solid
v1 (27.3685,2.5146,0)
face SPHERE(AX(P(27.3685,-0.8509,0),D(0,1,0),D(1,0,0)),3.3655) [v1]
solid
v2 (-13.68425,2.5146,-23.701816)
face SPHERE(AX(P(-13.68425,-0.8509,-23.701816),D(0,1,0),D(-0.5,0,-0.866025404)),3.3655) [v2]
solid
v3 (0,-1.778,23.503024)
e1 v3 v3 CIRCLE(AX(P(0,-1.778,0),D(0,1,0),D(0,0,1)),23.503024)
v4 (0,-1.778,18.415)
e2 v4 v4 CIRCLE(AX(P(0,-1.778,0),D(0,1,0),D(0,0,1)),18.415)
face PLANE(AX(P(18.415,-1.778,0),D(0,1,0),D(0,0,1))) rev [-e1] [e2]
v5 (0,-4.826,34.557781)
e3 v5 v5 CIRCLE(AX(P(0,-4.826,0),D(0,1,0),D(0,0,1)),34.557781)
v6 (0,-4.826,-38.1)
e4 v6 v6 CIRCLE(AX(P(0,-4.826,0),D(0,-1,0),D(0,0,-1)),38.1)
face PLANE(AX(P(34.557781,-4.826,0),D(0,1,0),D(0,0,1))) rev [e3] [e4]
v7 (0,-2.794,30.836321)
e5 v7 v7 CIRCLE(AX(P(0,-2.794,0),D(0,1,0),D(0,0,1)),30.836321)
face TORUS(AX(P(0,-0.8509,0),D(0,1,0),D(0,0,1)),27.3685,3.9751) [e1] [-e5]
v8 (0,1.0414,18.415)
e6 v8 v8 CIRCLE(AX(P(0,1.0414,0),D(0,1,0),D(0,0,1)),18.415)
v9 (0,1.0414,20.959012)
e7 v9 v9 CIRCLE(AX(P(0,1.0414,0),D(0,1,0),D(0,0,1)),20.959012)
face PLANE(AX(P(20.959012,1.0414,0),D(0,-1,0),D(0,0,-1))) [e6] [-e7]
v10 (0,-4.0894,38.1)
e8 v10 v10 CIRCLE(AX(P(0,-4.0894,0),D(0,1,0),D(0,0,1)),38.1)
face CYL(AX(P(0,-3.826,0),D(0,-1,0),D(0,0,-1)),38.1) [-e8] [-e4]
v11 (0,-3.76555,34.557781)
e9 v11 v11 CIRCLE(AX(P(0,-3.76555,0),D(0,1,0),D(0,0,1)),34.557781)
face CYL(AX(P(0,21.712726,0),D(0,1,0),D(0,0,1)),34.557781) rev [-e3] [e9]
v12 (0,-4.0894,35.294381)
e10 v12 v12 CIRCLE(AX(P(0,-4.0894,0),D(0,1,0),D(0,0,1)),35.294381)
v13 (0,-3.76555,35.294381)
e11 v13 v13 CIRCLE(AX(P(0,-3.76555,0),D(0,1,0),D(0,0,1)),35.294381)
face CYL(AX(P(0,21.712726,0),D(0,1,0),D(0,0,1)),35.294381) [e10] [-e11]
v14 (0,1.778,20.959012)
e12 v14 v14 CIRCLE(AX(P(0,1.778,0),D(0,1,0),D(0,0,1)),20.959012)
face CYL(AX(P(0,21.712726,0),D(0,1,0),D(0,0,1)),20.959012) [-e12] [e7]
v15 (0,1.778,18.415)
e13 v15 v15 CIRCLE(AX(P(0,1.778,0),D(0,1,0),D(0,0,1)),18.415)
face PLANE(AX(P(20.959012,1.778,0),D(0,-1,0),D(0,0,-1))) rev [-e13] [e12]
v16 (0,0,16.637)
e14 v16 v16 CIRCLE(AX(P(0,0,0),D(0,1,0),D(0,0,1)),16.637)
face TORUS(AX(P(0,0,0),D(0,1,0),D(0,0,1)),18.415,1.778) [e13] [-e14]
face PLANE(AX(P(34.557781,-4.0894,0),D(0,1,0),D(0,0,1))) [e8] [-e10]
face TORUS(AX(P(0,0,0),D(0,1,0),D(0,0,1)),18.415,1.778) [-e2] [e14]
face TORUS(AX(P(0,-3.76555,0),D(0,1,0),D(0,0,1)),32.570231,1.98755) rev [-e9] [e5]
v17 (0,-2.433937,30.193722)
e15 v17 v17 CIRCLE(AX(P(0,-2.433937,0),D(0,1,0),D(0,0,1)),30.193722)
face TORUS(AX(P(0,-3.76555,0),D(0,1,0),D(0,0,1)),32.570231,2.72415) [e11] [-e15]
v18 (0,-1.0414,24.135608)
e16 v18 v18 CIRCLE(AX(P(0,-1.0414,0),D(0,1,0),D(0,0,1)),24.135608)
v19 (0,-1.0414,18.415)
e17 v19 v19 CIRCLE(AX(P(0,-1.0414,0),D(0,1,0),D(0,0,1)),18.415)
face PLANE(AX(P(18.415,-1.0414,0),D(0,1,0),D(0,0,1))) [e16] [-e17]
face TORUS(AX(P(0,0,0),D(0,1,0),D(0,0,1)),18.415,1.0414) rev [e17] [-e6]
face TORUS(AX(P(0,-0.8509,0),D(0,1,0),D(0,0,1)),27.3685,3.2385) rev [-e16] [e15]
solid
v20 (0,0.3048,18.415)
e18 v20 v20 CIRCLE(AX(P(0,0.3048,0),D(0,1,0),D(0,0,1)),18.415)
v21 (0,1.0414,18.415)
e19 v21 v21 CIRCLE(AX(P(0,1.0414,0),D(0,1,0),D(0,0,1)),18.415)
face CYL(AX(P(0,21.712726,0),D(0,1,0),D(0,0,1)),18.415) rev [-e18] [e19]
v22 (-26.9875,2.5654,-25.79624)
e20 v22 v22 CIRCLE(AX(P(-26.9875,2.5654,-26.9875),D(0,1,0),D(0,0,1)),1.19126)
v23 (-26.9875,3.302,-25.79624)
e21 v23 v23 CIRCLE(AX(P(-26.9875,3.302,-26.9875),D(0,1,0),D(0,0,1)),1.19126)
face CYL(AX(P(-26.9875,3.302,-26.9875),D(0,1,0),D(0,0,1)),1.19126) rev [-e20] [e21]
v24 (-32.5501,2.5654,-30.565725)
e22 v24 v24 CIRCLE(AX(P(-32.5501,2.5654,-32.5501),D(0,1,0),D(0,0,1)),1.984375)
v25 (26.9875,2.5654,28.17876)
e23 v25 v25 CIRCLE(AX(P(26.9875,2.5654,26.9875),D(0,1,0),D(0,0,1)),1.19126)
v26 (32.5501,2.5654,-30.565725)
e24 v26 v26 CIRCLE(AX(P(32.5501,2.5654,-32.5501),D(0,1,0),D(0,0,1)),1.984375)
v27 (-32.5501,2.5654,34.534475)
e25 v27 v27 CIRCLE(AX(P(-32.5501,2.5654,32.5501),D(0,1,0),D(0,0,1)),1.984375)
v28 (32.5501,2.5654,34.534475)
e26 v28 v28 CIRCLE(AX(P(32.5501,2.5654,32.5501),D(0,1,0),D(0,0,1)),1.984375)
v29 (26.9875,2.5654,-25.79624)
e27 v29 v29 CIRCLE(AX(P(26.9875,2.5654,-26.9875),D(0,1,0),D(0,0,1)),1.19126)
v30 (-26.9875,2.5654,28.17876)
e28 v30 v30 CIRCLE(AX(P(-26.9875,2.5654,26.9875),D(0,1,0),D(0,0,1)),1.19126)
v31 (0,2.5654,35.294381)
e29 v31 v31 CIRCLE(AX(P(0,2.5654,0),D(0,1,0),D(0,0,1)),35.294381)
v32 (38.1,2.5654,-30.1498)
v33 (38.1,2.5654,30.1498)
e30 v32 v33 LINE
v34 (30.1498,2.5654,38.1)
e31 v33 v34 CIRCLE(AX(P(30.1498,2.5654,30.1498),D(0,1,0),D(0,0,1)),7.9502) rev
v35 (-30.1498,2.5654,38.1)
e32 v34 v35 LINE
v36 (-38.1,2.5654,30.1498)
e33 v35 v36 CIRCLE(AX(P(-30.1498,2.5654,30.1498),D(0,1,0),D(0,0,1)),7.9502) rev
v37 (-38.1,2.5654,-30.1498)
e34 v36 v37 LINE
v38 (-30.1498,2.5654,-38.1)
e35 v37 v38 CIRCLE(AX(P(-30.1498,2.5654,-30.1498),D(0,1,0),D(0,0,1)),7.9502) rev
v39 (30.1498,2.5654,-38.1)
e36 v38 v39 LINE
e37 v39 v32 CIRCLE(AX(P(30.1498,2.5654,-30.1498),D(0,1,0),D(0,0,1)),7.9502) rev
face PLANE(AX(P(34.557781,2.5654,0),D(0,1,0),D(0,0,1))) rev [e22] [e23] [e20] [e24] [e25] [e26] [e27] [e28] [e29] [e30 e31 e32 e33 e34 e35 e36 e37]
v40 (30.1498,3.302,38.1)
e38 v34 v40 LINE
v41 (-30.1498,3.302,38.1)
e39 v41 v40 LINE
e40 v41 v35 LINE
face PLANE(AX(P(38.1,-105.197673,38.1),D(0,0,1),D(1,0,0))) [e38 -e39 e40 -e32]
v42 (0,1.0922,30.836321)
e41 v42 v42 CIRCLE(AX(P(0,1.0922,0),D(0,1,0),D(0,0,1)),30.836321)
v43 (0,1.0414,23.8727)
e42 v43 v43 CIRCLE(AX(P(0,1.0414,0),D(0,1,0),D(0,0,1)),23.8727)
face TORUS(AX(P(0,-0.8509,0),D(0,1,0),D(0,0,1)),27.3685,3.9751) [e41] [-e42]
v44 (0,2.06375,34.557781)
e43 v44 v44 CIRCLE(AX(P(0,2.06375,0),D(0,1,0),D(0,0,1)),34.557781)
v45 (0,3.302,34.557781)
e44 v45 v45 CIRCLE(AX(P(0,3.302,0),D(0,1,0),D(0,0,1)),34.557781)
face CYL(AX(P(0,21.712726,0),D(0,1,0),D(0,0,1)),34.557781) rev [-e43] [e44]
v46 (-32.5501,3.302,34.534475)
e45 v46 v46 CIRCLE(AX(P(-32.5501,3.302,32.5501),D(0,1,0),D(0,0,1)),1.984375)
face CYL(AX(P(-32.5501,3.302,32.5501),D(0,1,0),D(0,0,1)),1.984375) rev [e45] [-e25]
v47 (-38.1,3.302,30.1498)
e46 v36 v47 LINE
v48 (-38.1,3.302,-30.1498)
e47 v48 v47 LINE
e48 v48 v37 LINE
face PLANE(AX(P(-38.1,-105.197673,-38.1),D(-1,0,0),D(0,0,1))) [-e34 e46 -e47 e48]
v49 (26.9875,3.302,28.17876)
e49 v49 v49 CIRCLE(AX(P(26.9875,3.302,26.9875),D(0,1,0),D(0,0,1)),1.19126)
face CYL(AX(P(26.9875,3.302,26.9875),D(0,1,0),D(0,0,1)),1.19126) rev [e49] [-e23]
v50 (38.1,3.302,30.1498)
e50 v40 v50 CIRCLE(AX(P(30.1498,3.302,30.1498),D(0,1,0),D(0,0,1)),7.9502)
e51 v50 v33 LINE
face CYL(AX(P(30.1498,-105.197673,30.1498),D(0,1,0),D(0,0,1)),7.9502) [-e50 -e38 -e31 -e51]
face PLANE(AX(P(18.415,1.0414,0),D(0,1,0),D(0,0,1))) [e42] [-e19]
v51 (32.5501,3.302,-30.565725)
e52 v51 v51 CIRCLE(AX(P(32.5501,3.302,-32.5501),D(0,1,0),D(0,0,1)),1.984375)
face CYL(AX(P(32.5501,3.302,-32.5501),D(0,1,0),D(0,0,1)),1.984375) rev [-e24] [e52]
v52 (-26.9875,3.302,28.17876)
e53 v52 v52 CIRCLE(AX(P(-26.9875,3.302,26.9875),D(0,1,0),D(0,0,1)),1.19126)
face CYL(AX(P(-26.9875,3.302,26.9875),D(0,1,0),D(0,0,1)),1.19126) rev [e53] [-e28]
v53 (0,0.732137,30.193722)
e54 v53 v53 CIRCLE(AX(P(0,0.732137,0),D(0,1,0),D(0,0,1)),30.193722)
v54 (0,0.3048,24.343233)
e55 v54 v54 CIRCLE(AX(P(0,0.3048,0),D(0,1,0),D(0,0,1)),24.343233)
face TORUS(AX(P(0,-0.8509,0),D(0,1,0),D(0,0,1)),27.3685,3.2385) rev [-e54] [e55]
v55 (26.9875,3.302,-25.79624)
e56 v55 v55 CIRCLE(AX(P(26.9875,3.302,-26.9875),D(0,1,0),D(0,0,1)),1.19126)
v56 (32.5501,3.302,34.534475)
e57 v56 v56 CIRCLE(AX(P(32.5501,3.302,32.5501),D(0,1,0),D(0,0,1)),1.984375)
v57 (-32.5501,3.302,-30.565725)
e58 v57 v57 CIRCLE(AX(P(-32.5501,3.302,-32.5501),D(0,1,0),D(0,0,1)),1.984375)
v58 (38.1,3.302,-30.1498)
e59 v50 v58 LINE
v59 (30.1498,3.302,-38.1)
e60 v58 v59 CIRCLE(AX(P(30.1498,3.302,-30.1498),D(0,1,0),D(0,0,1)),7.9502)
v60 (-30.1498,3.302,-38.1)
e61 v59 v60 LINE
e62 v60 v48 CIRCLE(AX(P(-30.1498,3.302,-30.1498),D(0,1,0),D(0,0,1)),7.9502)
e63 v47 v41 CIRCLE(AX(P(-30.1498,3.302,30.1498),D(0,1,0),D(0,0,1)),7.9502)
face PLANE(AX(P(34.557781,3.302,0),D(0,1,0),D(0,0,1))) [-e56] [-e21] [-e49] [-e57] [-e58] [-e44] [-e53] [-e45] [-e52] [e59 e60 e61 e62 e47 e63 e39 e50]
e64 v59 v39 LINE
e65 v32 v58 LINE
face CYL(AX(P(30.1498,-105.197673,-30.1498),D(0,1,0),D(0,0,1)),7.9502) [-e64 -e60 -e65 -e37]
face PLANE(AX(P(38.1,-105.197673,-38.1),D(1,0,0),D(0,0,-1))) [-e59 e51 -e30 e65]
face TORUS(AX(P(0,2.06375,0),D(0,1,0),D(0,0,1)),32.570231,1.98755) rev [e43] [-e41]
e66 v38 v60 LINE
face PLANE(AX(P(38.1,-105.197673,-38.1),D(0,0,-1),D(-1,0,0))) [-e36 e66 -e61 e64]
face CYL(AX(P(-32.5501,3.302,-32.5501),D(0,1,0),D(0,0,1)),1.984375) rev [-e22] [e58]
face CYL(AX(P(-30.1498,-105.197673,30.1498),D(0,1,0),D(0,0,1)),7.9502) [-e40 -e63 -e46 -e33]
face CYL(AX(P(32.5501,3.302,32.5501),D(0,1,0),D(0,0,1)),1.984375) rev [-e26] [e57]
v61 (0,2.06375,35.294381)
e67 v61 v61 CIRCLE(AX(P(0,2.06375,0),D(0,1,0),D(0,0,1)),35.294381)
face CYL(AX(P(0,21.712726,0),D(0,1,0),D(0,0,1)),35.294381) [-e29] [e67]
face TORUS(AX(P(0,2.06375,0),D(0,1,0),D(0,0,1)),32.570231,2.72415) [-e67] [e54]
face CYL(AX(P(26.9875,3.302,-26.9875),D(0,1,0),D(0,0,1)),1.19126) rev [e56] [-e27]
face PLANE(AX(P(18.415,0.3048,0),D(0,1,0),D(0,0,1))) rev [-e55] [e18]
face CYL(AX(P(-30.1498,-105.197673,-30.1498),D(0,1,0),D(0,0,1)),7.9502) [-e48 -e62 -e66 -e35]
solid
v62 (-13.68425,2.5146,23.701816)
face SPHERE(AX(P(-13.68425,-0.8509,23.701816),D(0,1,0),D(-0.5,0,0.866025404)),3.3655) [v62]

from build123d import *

# Parameters (mm, degrees)
SKETCH2_R                                 = 34.557781481
EXTRUDE1_DEPTH                            = 0.7366
EXTRUDE2_START                            = -0.7366
SKETCH3_W                                 = 76.2
SKETCH3_H                                 = 76.2
SKETCH3_R                                 = 34.557781481
EXTRUDE2_DEPTH                            = 0.7366
CIRPATTERN1_COUNT                         = 3
FILLET1_R                                 = 7.9502
FILLET2_R                                 = 7.9502
SKETCH5_W                                 = 1.984375
SKETCH5_H                                 = 0.7366
F_5_32_0_156250_DIAMETER_HOLE1_AT_2_COUNT = 2
F_5_32_0_156250_DIAMETER_HOLE1_AT_2_PITCH = 65.1002
F_5_32_0_156250_DIAMETER_HOLE1_AT_3_COUNT = 2
F_5_32_0_156250_DIAMETER_HOLE1_AT_3_PITCH = 65.1002
F_5_32_0_156250_DIAMETER_HOLE1_AT_4_COUNT = 2
F_5_32_0_156250_DIAMETER_HOLE1_AT_4_PITCH = 92.065585753
SKETCH7_W                                 = 1.984375
SKETCH7_H                                 = 8.128
F_5_32_0_156250_DIAMETER_HOLE2_AT_2_COUNT = 2
F_5_32_0_156250_DIAMETER_HOLE2_AT_2_PITCH = 65.1002
F_5_32_0_156250_DIAMETER_HOLE2_AT_3_COUNT = 2
F_5_32_0_156250_DIAMETER_HOLE2_AT_3_PITCH = 92.065585753
F_5_32_0_156250_DIAMETER_HOLE2_AT_4_COUNT = 2
F_5_32_0_156250_DIAMETER_HOLE2_AT_4_PITCH = 65.1002
F_3_32_0_09375_DIAMETER_HOLE1_AT_2_COUNT  = 2
F_3_32_0_09375_DIAMETER_HOLE1_AT_2_PITCH  = 53.975
F_3_32_0_09375_DIAMETER_HOLE1_AT_3_COUNT  = 2
F_3_32_0_09375_DIAMETER_HOLE1_AT_3_PITCH  = 76.332177029
F_3_32_0_09375_DIAMETER_HOLE1_AT_4_COUNT  = 2
F_3_32_0_09375_DIAMETER_HOLE1_AT_4_PITCH  = 53.975
SKETCH11_R                                = 51.664614741
SKETCH11_R_2                              = 38.1
CUT_EXTRUDE1_DEPTH                        = 1


# Read off the part's stored shape, not the designer's step: Revolve-Thin5
with BuildPart() as part:
    # Sketch1 → Revolve-Thin4 (revolve)
    with BuildSketch(Plane.XY, mode=Mode.PRIVATE) as revolve_thin4_sk:
        with BuildLine():
            Line((20.959011942, 1.778), (18.415, 1.778))
            ThreePointArc((18.415, 1.778), (16.637, 0), (18.415, -1.778))
            Line((18.415, -1.778), (23.503023884, -1.778))
            ThreePointArc((23.503023884, -1.778), (26.822976031, -4.788389506), (30.836320987, -2.794))
            ThreePointArc((30.836320987, -2.794), (33.072287853, -1.842454994), (34.557781481, -3.76555))
            Line((34.557781481, -3.76555), (34.557781481, -4.826))
            Line((34.557781481, -4.826), (38.1, -4.826))
            Line((38.1, -4.826), (38.1, -4.0894))
            Line((38.1, -4.0894), (35.294381481, -4.0894))
            Line((35.294381481, -4.0894), (35.294381481, -3.76555))
            ThreePointArc((35.294381481, -3.76555), (33.258353473, -1.129742468), (30.193721571, -2.433936741))
            ThreePointArc((30.193721571, -2.433936741), (26.643008112, -4.007091339), (24.135607796, -1.0414))
            Line((24.135607796, -1.0414), (18.415, -1.0414))
            ThreePointArc((18.415, -1.0414), (17.3736, 0), (18.415, 1.0414))
            Line((18.415, 1.0414), (20.959011942, 1.0414))
            Line((20.959011942, 1.0414), (20.959011942, 1.778))
        make_face()
    revolve(revolve_thin4_sk.sketch.rotate(Axis((0, 21.71272626, 0), (0, -1, 0)), 90), axis=Axis((0, 21.71272626, 0), (0, -1, 0)))

    # Sketch2 → Extrude1 (add)
    with BuildSketch(Plane.XZ.offset(4.826)):
        Polygon((53.881536726, 0), (0, -53.881536726), (-53.881536726, 0), (0, 53.881536726), align=None)
        with Locations(Location((0, 0, 0), (0, 0, 90))):
            Circle(SKETCH2_R, mode=Mode.SUBTRACT)
    extrude(amount=-EXTRUDE1_DEPTH)

    # Fillet2
    fillet2_edges = [part.edges().sort_by_distance(p)[0] for p in [
        (0, -4.4577, -53.881536726),
        (-53.881536726, -4.4577, 0),
        (0, -4.4577, 53.881536726),
        (53.881536726, -4.4577, 0),
    ]]
    fillet(fillet2_edges, radius=FILLET2_R)

    # Sketch5 → 5/32 (0.156250) Diameter Hole1 (revolve, cut)
    with BuildSketch(Plane(origin=(0, -4.0894, -46.032792877), x_dir=(0, 0, 1), z_dir=(1, 0, 0))):
        with Locations((0.9921875, 0.3683)):
            Rectangle(SKETCH5_W, SKETCH5_H)
    f_5_32_0_156250_diameter_hole1 = revolve(axis=Axis((0, 2.2606, -46.032792877), (0, -1, 0)), mode=Mode.SUBTRACT)

    # 5/32 (0.156250) Diameter Hole1 at 2: 5/32 (0.156250) Diameter Hole1 ×2
    with Locations(*[Vector(0.7071067811865476, 0, 0.7071067811865475) * (i * F_5_32_0_156250_DIAMETER_HOLE1_AT_2_PITCH) for i in range(1, F_5_32_0_156250_DIAMETER_HOLE1_AT_2_COUNT)]):
        add(f_5_32_0_156250_diameter_hole1, mode=Mode.SUBTRACT)

    # 5/32 (0.156250) Diameter Hole1 at 3: 5/32 (0.156250) Diameter Hole1 ×2
    with Locations(*[Vector(-0.7071067811865475, 0, 0.7071067811865477) * (i * F_5_32_0_156250_DIAMETER_HOLE1_AT_3_PITCH) for i in range(1, F_5_32_0_156250_DIAMETER_HOLE1_AT_3_COUNT)]):
        add(f_5_32_0_156250_diameter_hole1, mode=Mode.SUBTRACT)

    # 5/32 (0.156250) Diameter Hole1 at 4: 5/32 (0.156250) Diameter Hole1 ×2
    with Locations(*[(0, 0, i * F_5_32_0_156250_DIAMETER_HOLE1_AT_4_PITCH) for i in range(1, F_5_32_0_156250_DIAMETER_HOLE1_AT_4_COUNT)]):
        add(f_5_32_0_156250_diameter_hole1, mode=Mode.SUBTRACT)

    # Sketch11 → Cut-Extrude1 (cut)
    with BuildSketch(Plane.XZ.offset(4.826)):
        Circle(SKETCH11_R)
        with Locations(Location((0, 0, 0), (0, 0, 270))):
            Circle(SKETCH11_R_2, mode=Mode.SUBTRACT)
    extrude(amount=-CUT_EXTRUDE1_DEPTH, mode=Mode.SUBTRACT)


with BuildPart() as body_2:
    # Revolve-Thin5 outline → Revolve-Thin5 (revolve)
    with BuildSketch(Plane.XY):
        with BuildLine():
            Line((38.1, 3.302), (34.557781481, 3.302))
            Line((34.557781481, 3.302), (34.557781481, 2.06375))
            ThreePointArc((34.557781481, 2.06375), (33.072287853, 0.140654994), (30.836320987, 1.0922))
            ThreePointArc((30.836320987, 1.0922), (27.339502199, 3.124094231), (23.872699559, 1.0414))
            Line((23.872699559, 1.0414), (18.415, 1.0414))
            Line((18.415, 1.0414), (18.415, 0.3048))
            Line((18.415, 0.3048), (24.343233109, 0.3048))
            ThreePointArc((24.343233109, 0.3048), (27.132579028, 2.378995284), (30.193721571, 0.732136741))
            ThreePointArc((30.193721571, 0.732136741), (33.258353473, -0.572057532), (35.294381481, 2.06375))
            Line((35.294381481, 2.06375), (35.294381481, 2.5654))
            Line((35.294381481, 2.5654), (38.1, 2.5654))
            Line((38.1, 2.5654), (38.1, 3.302))
        make_face()
    revolve(axis=Axis((0, 0, 0), (0, 1, 0)))

    # Sketch3 → Extrude2 (add)
    with BuildSketch(Plane(origin=(0, 3.302, 0), x_dir=(-1, 0, 0), z_dir=(0, 1, 0)).offset(EXTRUDE2_START)):
        Rectangle(SKETCH3_W, SKETCH3_H)
        with Locations(Location((0, 0, 0), (0, 0, 90))):
            Circle(SKETCH3_R, mode=Mode.SUBTRACT)
    extrude(amount=EXTRUDE2_DEPTH)

    # Fillet1
    fillet1_edges = [body_2.edges().sort_by_distance(p)[0] for p in [
        (-38.1, 2.9337, -38.1),
        (-38.1, 2.9337, 38.1),
        (38.1, 2.9337, 38.1),
        (38.1, 2.9337, -38.1),
    ]]
    fillet(fillet1_edges, radius=FILLET1_R)

    # Sketch7 → 5/32 (0.156250) Diameter Hole2 (revolve, cut)
    with BuildSketch(Plane(origin=(32.5501, 3.302, -32.5501), x_dir=(0, 0, 1), z_dir=(1, 0, 0))):
        with Locations((0.9921875, 4.064)):
            Rectangle(SKETCH7_W, SKETCH7_H)
    f_5_32_0_156250_diameter_hole2 = revolve(axis=Axis((32.5501, 9.652, -32.5501), (0, -1, 0)), mode=Mode.SUBTRACT)

    # 5/32 (0.156250) Diameter Hole2 at 2: 5/32 (0.156250) Diameter Hole2 ×2
    with Locations(*[(-i * F_5_32_0_156250_DIAMETER_HOLE2_AT_2_PITCH, 0, 0) for i in range(1, F_5_32_0_156250_DIAMETER_HOLE2_AT_2_COUNT)]):
        add(f_5_32_0_156250_diameter_hole2, mode=Mode.SUBTRACT)

    # 5/32 (0.156250) Diameter Hole2 at 3: 5/32 (0.156250) Diameter Hole2 ×2
    with Locations(*[Vector(-0.7071067811865476, 0, 0.7071067811865476) * (i * F_5_32_0_156250_DIAMETER_HOLE2_AT_3_PITCH) for i in range(1, F_5_32_0_156250_DIAMETER_HOLE2_AT_3_COUNT)]):
        add(f_5_32_0_156250_diameter_hole2, mode=Mode.SUBTRACT)

    # 5/32 (0.156250) Diameter Hole2 at 4: 5/32 (0.156250) Diameter Hole2 ×2
    with Locations(*[(0, 0, i * F_5_32_0_156250_DIAMETER_HOLE2_AT_4_PITCH) for i in range(1, F_5_32_0_156250_DIAMETER_HOLE2_AT_4_COUNT)]):
        add(f_5_32_0_156250_diameter_hole2, mode=Mode.SUBTRACT)

    # Sketch9 → 3/32 (0.09375) Diameter Hole1 (revolve, cut)
    with BuildSketch(Plane(origin=(-26.9875, 3.302, -26.9875), x_dir=(0, 0, 1), z_dir=(1, 0, 0))):
        Polygon((0, 0), (0, 3.890781221), (1.19126, 3.175), (1.19126, 0), align=None)
    f_3_32_0_09375_diameter_hole1 = revolve(axis=Axis((-26.9875, 9.652, -26.9875), (0, -1, 0)), mode=Mode.SUBTRACT)

    # 3/32 (0.09375) Diameter Hole1 at 2: 3/32 (0.09375) Diameter Hole1 ×2
    with Locations(*[(i * F_3_32_0_09375_DIAMETER_HOLE1_AT_2_PITCH, 0, 0) for i in range(1, F_3_32_0_09375_DIAMETER_HOLE1_AT_2_COUNT)]):
        add(f_3_32_0_09375_diameter_hole1, mode=Mode.SUBTRACT)

    # 3/32 (0.09375) Diameter Hole1 at 3: 3/32 (0.09375) Diameter Hole1 ×2
    with Locations(*[Vector(0.7071067811865476, 0, 0.7071067811865476) * (i * F_3_32_0_09375_DIAMETER_HOLE1_AT_3_PITCH) for i in range(1, F_3_32_0_09375_DIAMETER_HOLE1_AT_3_COUNT)]):
        add(f_3_32_0_09375_diameter_hole1, mode=Mode.SUBTRACT)

    # 3/32 (0.09375) Diameter Hole1 at 4: 3/32 (0.09375) Diameter Hole1 ×2
    with Locations(*[(0, 0, i * F_3_32_0_09375_DIAMETER_HOLE1_AT_4_PITCH) for i in range(1, F_3_32_0_09375_DIAMETER_HOLE1_AT_4_COUNT)]):
        add(f_3_32_0_09375_diameter_hole1, mode=Mode.SUBTRACT)


with BuildPart() as body_3:
    # Sketch4 → Revolve1 (revolve)
    with BuildSketch(Plane.XY):
        with BuildLine():
            Line((27.3685, 2.5146), (27.3685, -4.2164))
            ThreePointArc((27.3685, -4.2164), (30.734, -0.8509), (27.3685, 2.5146))
        make_face()
    revolve(axis=Axis((27.3685, 2.837450101, 0), (0, -1, 0)))


with BuildPart() as cirpattern1_1:
    # CirPattern1: pattern copy
    add(body_3.part.rotate(Axis((0, 0, 0), (0, 1, 0)), 1 * 360 / CIRPATTERN1_COUNT))


with BuildPart() as cirpattern1_2:
    # CirPattern1: pattern copy
    add(body_3.part.rotate(Axis((0, 0, 0), (0, 1, 0)), 2 * 360 / CIRPATTERN1_COUNT))


solid = Compound([part.part, body_2.part, body_3.part, cirpattern1_1.part, cirpattern1_2.part])
